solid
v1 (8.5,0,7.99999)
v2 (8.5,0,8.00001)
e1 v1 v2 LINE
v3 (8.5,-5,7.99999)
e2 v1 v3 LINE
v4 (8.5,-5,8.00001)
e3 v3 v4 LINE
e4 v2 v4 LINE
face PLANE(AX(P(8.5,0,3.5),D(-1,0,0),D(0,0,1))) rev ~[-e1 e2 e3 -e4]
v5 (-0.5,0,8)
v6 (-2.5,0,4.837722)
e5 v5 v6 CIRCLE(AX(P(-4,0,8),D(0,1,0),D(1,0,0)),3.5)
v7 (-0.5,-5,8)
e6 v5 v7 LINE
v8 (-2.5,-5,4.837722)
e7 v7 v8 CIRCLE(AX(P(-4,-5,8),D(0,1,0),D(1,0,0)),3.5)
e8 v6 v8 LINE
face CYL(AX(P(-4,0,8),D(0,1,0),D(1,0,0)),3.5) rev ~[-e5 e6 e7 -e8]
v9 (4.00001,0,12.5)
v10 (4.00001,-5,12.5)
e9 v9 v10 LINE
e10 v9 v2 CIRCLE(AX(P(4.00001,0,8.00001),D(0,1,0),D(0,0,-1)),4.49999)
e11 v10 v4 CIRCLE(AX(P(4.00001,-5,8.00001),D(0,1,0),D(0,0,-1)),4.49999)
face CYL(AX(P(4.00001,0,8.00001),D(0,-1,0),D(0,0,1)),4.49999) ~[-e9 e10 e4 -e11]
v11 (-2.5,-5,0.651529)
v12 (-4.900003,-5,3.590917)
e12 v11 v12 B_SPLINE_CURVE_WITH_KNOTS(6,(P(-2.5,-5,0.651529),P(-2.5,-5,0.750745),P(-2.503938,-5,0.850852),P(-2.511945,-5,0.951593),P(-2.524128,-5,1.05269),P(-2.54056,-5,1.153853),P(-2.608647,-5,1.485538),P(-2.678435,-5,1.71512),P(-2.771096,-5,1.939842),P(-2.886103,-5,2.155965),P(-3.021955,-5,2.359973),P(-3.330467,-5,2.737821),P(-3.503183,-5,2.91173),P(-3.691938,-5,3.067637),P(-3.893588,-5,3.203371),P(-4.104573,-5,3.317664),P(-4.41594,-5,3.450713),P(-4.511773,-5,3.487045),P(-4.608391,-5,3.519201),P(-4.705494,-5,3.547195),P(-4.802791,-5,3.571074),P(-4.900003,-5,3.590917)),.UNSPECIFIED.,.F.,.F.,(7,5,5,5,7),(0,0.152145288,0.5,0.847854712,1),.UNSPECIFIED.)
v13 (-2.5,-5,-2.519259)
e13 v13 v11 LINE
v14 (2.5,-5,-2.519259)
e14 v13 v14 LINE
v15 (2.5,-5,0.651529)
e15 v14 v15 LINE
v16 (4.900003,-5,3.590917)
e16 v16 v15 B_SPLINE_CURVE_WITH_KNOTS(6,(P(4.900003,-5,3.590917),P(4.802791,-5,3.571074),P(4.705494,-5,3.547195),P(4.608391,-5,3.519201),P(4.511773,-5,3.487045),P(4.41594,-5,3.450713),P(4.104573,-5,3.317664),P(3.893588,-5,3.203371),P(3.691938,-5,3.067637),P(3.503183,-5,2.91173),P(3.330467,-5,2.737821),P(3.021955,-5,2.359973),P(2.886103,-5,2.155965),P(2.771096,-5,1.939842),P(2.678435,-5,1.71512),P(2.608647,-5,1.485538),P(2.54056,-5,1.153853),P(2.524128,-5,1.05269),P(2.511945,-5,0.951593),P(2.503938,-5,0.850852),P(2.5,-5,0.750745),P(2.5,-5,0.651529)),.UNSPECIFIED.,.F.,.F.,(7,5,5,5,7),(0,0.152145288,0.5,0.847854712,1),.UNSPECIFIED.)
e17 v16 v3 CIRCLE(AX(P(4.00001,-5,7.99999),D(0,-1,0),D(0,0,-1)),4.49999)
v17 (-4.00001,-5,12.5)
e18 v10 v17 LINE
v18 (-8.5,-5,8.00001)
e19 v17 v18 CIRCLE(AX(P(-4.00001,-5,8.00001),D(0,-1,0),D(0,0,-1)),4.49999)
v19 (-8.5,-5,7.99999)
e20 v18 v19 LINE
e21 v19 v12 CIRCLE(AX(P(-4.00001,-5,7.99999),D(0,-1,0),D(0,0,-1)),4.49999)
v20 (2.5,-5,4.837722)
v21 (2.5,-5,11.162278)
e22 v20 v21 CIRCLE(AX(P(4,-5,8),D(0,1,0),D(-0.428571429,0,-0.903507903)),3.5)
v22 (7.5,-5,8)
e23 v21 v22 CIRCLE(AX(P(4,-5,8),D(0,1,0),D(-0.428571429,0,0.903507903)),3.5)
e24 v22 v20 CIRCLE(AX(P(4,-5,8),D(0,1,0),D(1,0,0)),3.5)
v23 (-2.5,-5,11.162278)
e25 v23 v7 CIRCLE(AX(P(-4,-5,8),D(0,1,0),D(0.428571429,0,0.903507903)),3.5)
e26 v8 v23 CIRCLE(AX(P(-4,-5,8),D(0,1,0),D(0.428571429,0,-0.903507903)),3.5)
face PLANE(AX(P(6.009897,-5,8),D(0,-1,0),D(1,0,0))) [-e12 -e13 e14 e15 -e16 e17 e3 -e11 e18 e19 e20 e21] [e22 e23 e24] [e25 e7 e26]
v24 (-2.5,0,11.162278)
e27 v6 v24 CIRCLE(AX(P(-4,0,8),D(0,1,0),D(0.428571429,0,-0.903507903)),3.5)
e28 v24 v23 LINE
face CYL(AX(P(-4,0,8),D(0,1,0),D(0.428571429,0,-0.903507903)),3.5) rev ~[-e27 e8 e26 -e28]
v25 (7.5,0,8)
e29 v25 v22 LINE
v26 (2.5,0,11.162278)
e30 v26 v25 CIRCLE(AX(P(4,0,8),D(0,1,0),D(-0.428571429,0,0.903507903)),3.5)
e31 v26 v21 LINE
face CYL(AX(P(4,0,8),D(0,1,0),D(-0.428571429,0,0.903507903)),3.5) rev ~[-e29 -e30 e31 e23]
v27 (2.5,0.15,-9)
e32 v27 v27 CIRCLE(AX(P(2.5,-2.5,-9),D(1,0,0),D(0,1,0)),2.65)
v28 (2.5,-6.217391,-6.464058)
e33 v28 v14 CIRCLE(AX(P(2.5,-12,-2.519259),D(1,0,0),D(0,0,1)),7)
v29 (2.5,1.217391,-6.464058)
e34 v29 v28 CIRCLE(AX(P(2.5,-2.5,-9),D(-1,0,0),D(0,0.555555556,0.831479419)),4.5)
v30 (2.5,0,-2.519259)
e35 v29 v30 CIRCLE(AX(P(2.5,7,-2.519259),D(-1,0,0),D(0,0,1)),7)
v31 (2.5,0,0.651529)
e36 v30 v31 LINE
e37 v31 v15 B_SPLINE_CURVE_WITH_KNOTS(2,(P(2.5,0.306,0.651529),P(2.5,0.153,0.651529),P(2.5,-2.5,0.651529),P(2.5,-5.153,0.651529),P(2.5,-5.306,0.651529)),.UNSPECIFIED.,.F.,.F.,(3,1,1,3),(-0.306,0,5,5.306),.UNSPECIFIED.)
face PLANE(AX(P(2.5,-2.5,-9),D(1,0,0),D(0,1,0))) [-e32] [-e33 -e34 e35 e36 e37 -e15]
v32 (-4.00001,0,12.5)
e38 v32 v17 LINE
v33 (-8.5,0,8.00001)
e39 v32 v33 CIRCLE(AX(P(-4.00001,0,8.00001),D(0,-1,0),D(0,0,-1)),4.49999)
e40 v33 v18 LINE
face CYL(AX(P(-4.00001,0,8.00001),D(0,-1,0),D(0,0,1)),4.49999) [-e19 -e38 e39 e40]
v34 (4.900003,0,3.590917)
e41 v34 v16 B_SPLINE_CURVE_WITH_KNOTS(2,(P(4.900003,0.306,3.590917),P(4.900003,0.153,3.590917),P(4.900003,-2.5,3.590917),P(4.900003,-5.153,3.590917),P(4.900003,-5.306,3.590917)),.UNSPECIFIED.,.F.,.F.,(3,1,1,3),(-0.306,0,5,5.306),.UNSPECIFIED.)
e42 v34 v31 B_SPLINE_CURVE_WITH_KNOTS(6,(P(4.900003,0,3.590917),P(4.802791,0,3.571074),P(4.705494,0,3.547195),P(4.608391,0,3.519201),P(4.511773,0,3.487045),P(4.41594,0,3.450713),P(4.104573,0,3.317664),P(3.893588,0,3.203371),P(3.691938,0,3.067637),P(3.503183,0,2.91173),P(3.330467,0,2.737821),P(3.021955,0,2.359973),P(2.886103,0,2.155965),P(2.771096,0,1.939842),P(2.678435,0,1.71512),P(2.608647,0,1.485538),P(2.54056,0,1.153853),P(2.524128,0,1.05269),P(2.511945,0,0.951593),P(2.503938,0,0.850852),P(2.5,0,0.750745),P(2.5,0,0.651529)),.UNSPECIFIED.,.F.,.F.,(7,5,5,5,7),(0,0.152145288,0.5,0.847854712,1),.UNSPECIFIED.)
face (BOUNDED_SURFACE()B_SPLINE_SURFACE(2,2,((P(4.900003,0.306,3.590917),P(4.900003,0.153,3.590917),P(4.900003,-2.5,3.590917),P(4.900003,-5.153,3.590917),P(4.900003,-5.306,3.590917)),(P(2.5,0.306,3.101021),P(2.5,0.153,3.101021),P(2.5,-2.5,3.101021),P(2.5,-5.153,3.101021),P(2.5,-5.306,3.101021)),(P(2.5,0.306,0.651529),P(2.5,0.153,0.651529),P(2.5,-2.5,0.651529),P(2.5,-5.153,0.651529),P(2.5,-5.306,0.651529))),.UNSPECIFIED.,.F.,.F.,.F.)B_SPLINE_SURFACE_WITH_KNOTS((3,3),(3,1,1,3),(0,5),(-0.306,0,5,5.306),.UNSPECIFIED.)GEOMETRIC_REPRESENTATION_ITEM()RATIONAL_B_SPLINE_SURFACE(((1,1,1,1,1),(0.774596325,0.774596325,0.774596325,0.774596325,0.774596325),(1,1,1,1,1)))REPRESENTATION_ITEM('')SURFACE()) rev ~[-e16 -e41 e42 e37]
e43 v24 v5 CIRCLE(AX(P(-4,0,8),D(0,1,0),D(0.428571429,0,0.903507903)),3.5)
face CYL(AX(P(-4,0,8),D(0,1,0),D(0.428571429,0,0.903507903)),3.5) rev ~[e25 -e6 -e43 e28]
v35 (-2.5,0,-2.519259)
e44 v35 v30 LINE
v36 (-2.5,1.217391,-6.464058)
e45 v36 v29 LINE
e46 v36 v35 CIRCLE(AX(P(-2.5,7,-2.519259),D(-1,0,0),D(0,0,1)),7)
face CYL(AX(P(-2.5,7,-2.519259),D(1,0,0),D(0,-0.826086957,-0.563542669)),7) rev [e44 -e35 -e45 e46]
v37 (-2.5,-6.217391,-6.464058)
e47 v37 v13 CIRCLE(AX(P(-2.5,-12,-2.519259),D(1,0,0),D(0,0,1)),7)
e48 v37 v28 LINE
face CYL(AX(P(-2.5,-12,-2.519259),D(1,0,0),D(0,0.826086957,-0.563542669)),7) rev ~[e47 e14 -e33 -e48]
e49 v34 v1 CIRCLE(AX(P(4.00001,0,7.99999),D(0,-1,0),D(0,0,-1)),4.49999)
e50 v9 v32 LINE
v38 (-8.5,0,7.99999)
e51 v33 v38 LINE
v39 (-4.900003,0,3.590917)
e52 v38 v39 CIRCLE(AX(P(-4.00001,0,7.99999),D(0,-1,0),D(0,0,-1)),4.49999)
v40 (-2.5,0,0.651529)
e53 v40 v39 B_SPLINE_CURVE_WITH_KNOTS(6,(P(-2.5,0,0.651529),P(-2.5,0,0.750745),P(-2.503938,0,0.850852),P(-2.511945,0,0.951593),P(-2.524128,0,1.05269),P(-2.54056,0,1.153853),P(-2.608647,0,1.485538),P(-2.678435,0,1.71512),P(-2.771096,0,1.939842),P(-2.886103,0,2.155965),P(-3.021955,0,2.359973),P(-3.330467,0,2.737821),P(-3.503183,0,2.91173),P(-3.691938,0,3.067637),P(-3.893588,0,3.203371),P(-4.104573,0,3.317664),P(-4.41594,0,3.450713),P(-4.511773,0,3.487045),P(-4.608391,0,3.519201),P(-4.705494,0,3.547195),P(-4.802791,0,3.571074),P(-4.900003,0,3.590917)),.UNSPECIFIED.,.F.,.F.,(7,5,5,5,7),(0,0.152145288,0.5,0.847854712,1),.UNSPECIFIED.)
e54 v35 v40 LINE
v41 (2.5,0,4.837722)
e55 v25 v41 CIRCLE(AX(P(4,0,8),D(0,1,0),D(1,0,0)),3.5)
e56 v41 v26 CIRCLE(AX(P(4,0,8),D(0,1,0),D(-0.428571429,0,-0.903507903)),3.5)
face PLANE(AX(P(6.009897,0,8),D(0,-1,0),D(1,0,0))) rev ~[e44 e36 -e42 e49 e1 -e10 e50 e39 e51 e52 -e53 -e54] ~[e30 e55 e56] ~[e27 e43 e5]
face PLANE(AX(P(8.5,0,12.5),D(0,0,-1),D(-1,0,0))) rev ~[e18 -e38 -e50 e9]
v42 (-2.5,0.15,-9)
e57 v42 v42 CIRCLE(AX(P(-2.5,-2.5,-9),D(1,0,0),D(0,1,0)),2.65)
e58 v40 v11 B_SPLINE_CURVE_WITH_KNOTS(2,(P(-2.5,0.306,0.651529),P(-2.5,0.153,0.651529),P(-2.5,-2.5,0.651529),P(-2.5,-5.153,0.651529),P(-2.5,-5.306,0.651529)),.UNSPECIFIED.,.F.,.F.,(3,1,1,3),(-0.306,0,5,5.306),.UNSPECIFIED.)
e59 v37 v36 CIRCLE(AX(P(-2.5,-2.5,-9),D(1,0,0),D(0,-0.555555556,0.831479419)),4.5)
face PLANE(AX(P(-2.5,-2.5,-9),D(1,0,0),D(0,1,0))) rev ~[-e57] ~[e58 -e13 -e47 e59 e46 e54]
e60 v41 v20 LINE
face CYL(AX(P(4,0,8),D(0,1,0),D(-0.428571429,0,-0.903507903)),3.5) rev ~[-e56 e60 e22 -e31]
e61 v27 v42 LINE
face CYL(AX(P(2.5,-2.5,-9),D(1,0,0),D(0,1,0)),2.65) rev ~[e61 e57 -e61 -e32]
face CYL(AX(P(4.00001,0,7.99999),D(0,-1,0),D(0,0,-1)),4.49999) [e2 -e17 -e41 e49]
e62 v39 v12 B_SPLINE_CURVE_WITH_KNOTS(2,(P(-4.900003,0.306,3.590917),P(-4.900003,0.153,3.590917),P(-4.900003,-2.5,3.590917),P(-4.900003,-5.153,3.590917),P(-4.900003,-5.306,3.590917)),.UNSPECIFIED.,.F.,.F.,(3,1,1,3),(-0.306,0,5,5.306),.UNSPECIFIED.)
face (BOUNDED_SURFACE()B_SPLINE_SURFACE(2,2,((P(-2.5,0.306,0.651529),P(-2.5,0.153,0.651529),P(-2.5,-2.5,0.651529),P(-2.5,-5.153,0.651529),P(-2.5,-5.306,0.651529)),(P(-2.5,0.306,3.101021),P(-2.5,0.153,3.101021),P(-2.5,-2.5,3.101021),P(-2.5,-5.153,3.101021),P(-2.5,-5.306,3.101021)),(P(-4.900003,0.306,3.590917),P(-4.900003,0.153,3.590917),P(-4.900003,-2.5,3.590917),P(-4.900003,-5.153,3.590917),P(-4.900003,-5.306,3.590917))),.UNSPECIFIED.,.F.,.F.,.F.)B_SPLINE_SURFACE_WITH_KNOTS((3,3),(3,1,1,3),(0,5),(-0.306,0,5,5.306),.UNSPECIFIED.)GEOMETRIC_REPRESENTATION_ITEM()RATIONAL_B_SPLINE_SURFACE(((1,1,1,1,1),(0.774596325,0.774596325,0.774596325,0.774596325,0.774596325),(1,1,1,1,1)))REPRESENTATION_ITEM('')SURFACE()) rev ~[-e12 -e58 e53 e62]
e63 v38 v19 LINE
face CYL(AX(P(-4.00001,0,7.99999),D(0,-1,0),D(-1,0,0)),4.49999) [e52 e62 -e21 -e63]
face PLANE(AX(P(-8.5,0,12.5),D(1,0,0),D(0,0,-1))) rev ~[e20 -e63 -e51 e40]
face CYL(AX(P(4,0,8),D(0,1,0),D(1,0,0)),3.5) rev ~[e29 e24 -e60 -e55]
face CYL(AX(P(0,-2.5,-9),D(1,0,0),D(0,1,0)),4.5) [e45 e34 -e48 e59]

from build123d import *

# Parameters (mm, degrees)
F0_W        = 5
F0_H        = 16
F1_DEPTH    = 5
F2_R        = 4.49999
F3_T1_DEPTH = 22.5
F4_R        = 3
F5_R        = 4.5
F6_DEPTH    = 2.5
F7_R        = 2.65
F8_DEPTH    = 25
F9_R        = 7


# Not quite as in the source:
# - a fillet or chamfer that OpenCascade refuses, or shapes differently, is made with other operations: its cross-section is extruded or revolved along the edge and cut away or added
# - a fillet or chamfer is up to 0.001 mm smaller than in the source, because OpenCascade refuses the exact size


with BuildPart() as f1:
    # F0 (on Front) → F1 (new body)
    with BuildSketch(Plane.XZ):
        with BuildLine():
            Line((8.5, 12.5), (2.5, 12.5))
            Line((2.5, 12.5), (2.5, 11.1622776602))
            ThreePointArc((2.5, 11.1622776602), (5.8708286934, 10.9580398915), (7.5, 8))
            ThreePointArc((7.5, 8), (5.8708286934, 5.0419601085), (2.5, 4.8377223398))
            Line((2.5, 4.8377223398), (2.5, 3.5))
            Line((2.5, 3.5), (8.5, 3.5))
            Line((8.5, 3.5), (8.5, 12.5))
        make_face()
        with BuildLine():
            Line((-2.5, 11.1622776602), (-2.5, 12.5))
            Line((-2.5, 12.5), (-8.5, 12.5))
            Line((-8.5, 12.5), (-8.5, 3.5))
            Line((-8.5, 3.5), (-2.5, 3.5))
            Line((-2.5, 3.5), (-2.5, 4.8377223398))
            ThreePointArc((-2.5, 4.8377223398), (-7.5, 8), (-2.5, 11.1622776602))
        make_face()
        with BuildLine():
            Line((2.5, 11.1622776602), (2.5, 12.5))
            Line((2.5, 12.5), (-2.5, 12.5))
            Line((-2.5, 12.5), (-2.5, 11.1622776602))
            ThreePointArc((-2.5, 11.1622776602), (-1.0419601085, 9.8708286934), (-0.5, 8))
            ThreePointArc((-0.5, 8), (-1.0419601085, 6.1291713066), (-2.5, 4.8377223398))
            Line((-2.5, 4.8377223398), (-2.5, 3.5))
            Line((-2.5, 3.5), (2.5, 3.5))
            Line((2.5, 3.5), (2.5, 4.8377223398))
            ThreePointArc((2.5, 4.8377223398), (0.5, 8), (2.5, 11.1622776602))
        make_face()
        with Locations((0, -4.5)):
            Rectangle(F0_W, F0_H)
    extrude(amount=F1_DEPTH)

    # F2 (radius 4.5 in the source; OpenCascade refuses exactly that, so slightly less here)
    f2_edges = [f1.edges().sort_by_distance(p)[0] for p in [
        (8.5, -2.5, 12.5),
        (-8.5, -2.5, 12.5),
        (8.5, -2.5, 3.5),
        (-8.5, -2.5, 3.5),
    ]]
    fillet(f2_edges, radius=F2_R)

    # F3: fillet of radius 3.5 on 2 edges, made by hand

    # F3_s2 → F3_t1 (cut)
    with BuildSketch(Plane.YZ.offset(-11.25)):
        with BuildLine():
            ThreePointArc((0, -9), (-1.0251262658, -11.4748737342), (-3.5, -12.5))
            Line((-3.5, -12.5), (0, -12.5))
            Line((0, -12.5), (0, -9))
        make_face()
        with BuildLine():
            ThreePointArc((-5, -9), (-3.9748737342, -11.4748737342), (-1.5, -12.5))
            Line((-1.5, -12.5), (-5, -12.5))
            Line((-5, -12.5), (-5, -9))
        make_face()
    extrude(amount=F3_T1_DEPTH, mode=Mode.SUBTRACT)

    # F4
    f4_edges = [f1.edges().sort_by_distance(p)[0] for p in [
        (2.5, -2.5, 3.5),
        (-2.5, -2.5, 3.5),
    ]]
    fillet(f4_edges, radius=F4_R)

    # F5 (on Right) → F6 (join, symmetric)
    with BuildSketch(Plane.YZ):
        with Locations((-2.5, -9)):
            Circle(F5_R)
    extrude(amount=F6_DEPTH, both=True)

    # F7 (on face) → F8 (cut)
    with BuildSketch(Plane.YZ.offset(2.5)):
        with Locations((-2.5, -9)):
            Circle(F7_R)
    extrude(amount=-F8_DEPTH, mode=Mode.SUBTRACT)

    # F9
    f9_edges = [f1.edges().sort_by_distance(p)[0] for p in [
        (0, 0, -5.258343),
        (0, -5, -5.258343),
    ]]
    fillet(f9_edges, radius=F9_R)


solid = f1.part
